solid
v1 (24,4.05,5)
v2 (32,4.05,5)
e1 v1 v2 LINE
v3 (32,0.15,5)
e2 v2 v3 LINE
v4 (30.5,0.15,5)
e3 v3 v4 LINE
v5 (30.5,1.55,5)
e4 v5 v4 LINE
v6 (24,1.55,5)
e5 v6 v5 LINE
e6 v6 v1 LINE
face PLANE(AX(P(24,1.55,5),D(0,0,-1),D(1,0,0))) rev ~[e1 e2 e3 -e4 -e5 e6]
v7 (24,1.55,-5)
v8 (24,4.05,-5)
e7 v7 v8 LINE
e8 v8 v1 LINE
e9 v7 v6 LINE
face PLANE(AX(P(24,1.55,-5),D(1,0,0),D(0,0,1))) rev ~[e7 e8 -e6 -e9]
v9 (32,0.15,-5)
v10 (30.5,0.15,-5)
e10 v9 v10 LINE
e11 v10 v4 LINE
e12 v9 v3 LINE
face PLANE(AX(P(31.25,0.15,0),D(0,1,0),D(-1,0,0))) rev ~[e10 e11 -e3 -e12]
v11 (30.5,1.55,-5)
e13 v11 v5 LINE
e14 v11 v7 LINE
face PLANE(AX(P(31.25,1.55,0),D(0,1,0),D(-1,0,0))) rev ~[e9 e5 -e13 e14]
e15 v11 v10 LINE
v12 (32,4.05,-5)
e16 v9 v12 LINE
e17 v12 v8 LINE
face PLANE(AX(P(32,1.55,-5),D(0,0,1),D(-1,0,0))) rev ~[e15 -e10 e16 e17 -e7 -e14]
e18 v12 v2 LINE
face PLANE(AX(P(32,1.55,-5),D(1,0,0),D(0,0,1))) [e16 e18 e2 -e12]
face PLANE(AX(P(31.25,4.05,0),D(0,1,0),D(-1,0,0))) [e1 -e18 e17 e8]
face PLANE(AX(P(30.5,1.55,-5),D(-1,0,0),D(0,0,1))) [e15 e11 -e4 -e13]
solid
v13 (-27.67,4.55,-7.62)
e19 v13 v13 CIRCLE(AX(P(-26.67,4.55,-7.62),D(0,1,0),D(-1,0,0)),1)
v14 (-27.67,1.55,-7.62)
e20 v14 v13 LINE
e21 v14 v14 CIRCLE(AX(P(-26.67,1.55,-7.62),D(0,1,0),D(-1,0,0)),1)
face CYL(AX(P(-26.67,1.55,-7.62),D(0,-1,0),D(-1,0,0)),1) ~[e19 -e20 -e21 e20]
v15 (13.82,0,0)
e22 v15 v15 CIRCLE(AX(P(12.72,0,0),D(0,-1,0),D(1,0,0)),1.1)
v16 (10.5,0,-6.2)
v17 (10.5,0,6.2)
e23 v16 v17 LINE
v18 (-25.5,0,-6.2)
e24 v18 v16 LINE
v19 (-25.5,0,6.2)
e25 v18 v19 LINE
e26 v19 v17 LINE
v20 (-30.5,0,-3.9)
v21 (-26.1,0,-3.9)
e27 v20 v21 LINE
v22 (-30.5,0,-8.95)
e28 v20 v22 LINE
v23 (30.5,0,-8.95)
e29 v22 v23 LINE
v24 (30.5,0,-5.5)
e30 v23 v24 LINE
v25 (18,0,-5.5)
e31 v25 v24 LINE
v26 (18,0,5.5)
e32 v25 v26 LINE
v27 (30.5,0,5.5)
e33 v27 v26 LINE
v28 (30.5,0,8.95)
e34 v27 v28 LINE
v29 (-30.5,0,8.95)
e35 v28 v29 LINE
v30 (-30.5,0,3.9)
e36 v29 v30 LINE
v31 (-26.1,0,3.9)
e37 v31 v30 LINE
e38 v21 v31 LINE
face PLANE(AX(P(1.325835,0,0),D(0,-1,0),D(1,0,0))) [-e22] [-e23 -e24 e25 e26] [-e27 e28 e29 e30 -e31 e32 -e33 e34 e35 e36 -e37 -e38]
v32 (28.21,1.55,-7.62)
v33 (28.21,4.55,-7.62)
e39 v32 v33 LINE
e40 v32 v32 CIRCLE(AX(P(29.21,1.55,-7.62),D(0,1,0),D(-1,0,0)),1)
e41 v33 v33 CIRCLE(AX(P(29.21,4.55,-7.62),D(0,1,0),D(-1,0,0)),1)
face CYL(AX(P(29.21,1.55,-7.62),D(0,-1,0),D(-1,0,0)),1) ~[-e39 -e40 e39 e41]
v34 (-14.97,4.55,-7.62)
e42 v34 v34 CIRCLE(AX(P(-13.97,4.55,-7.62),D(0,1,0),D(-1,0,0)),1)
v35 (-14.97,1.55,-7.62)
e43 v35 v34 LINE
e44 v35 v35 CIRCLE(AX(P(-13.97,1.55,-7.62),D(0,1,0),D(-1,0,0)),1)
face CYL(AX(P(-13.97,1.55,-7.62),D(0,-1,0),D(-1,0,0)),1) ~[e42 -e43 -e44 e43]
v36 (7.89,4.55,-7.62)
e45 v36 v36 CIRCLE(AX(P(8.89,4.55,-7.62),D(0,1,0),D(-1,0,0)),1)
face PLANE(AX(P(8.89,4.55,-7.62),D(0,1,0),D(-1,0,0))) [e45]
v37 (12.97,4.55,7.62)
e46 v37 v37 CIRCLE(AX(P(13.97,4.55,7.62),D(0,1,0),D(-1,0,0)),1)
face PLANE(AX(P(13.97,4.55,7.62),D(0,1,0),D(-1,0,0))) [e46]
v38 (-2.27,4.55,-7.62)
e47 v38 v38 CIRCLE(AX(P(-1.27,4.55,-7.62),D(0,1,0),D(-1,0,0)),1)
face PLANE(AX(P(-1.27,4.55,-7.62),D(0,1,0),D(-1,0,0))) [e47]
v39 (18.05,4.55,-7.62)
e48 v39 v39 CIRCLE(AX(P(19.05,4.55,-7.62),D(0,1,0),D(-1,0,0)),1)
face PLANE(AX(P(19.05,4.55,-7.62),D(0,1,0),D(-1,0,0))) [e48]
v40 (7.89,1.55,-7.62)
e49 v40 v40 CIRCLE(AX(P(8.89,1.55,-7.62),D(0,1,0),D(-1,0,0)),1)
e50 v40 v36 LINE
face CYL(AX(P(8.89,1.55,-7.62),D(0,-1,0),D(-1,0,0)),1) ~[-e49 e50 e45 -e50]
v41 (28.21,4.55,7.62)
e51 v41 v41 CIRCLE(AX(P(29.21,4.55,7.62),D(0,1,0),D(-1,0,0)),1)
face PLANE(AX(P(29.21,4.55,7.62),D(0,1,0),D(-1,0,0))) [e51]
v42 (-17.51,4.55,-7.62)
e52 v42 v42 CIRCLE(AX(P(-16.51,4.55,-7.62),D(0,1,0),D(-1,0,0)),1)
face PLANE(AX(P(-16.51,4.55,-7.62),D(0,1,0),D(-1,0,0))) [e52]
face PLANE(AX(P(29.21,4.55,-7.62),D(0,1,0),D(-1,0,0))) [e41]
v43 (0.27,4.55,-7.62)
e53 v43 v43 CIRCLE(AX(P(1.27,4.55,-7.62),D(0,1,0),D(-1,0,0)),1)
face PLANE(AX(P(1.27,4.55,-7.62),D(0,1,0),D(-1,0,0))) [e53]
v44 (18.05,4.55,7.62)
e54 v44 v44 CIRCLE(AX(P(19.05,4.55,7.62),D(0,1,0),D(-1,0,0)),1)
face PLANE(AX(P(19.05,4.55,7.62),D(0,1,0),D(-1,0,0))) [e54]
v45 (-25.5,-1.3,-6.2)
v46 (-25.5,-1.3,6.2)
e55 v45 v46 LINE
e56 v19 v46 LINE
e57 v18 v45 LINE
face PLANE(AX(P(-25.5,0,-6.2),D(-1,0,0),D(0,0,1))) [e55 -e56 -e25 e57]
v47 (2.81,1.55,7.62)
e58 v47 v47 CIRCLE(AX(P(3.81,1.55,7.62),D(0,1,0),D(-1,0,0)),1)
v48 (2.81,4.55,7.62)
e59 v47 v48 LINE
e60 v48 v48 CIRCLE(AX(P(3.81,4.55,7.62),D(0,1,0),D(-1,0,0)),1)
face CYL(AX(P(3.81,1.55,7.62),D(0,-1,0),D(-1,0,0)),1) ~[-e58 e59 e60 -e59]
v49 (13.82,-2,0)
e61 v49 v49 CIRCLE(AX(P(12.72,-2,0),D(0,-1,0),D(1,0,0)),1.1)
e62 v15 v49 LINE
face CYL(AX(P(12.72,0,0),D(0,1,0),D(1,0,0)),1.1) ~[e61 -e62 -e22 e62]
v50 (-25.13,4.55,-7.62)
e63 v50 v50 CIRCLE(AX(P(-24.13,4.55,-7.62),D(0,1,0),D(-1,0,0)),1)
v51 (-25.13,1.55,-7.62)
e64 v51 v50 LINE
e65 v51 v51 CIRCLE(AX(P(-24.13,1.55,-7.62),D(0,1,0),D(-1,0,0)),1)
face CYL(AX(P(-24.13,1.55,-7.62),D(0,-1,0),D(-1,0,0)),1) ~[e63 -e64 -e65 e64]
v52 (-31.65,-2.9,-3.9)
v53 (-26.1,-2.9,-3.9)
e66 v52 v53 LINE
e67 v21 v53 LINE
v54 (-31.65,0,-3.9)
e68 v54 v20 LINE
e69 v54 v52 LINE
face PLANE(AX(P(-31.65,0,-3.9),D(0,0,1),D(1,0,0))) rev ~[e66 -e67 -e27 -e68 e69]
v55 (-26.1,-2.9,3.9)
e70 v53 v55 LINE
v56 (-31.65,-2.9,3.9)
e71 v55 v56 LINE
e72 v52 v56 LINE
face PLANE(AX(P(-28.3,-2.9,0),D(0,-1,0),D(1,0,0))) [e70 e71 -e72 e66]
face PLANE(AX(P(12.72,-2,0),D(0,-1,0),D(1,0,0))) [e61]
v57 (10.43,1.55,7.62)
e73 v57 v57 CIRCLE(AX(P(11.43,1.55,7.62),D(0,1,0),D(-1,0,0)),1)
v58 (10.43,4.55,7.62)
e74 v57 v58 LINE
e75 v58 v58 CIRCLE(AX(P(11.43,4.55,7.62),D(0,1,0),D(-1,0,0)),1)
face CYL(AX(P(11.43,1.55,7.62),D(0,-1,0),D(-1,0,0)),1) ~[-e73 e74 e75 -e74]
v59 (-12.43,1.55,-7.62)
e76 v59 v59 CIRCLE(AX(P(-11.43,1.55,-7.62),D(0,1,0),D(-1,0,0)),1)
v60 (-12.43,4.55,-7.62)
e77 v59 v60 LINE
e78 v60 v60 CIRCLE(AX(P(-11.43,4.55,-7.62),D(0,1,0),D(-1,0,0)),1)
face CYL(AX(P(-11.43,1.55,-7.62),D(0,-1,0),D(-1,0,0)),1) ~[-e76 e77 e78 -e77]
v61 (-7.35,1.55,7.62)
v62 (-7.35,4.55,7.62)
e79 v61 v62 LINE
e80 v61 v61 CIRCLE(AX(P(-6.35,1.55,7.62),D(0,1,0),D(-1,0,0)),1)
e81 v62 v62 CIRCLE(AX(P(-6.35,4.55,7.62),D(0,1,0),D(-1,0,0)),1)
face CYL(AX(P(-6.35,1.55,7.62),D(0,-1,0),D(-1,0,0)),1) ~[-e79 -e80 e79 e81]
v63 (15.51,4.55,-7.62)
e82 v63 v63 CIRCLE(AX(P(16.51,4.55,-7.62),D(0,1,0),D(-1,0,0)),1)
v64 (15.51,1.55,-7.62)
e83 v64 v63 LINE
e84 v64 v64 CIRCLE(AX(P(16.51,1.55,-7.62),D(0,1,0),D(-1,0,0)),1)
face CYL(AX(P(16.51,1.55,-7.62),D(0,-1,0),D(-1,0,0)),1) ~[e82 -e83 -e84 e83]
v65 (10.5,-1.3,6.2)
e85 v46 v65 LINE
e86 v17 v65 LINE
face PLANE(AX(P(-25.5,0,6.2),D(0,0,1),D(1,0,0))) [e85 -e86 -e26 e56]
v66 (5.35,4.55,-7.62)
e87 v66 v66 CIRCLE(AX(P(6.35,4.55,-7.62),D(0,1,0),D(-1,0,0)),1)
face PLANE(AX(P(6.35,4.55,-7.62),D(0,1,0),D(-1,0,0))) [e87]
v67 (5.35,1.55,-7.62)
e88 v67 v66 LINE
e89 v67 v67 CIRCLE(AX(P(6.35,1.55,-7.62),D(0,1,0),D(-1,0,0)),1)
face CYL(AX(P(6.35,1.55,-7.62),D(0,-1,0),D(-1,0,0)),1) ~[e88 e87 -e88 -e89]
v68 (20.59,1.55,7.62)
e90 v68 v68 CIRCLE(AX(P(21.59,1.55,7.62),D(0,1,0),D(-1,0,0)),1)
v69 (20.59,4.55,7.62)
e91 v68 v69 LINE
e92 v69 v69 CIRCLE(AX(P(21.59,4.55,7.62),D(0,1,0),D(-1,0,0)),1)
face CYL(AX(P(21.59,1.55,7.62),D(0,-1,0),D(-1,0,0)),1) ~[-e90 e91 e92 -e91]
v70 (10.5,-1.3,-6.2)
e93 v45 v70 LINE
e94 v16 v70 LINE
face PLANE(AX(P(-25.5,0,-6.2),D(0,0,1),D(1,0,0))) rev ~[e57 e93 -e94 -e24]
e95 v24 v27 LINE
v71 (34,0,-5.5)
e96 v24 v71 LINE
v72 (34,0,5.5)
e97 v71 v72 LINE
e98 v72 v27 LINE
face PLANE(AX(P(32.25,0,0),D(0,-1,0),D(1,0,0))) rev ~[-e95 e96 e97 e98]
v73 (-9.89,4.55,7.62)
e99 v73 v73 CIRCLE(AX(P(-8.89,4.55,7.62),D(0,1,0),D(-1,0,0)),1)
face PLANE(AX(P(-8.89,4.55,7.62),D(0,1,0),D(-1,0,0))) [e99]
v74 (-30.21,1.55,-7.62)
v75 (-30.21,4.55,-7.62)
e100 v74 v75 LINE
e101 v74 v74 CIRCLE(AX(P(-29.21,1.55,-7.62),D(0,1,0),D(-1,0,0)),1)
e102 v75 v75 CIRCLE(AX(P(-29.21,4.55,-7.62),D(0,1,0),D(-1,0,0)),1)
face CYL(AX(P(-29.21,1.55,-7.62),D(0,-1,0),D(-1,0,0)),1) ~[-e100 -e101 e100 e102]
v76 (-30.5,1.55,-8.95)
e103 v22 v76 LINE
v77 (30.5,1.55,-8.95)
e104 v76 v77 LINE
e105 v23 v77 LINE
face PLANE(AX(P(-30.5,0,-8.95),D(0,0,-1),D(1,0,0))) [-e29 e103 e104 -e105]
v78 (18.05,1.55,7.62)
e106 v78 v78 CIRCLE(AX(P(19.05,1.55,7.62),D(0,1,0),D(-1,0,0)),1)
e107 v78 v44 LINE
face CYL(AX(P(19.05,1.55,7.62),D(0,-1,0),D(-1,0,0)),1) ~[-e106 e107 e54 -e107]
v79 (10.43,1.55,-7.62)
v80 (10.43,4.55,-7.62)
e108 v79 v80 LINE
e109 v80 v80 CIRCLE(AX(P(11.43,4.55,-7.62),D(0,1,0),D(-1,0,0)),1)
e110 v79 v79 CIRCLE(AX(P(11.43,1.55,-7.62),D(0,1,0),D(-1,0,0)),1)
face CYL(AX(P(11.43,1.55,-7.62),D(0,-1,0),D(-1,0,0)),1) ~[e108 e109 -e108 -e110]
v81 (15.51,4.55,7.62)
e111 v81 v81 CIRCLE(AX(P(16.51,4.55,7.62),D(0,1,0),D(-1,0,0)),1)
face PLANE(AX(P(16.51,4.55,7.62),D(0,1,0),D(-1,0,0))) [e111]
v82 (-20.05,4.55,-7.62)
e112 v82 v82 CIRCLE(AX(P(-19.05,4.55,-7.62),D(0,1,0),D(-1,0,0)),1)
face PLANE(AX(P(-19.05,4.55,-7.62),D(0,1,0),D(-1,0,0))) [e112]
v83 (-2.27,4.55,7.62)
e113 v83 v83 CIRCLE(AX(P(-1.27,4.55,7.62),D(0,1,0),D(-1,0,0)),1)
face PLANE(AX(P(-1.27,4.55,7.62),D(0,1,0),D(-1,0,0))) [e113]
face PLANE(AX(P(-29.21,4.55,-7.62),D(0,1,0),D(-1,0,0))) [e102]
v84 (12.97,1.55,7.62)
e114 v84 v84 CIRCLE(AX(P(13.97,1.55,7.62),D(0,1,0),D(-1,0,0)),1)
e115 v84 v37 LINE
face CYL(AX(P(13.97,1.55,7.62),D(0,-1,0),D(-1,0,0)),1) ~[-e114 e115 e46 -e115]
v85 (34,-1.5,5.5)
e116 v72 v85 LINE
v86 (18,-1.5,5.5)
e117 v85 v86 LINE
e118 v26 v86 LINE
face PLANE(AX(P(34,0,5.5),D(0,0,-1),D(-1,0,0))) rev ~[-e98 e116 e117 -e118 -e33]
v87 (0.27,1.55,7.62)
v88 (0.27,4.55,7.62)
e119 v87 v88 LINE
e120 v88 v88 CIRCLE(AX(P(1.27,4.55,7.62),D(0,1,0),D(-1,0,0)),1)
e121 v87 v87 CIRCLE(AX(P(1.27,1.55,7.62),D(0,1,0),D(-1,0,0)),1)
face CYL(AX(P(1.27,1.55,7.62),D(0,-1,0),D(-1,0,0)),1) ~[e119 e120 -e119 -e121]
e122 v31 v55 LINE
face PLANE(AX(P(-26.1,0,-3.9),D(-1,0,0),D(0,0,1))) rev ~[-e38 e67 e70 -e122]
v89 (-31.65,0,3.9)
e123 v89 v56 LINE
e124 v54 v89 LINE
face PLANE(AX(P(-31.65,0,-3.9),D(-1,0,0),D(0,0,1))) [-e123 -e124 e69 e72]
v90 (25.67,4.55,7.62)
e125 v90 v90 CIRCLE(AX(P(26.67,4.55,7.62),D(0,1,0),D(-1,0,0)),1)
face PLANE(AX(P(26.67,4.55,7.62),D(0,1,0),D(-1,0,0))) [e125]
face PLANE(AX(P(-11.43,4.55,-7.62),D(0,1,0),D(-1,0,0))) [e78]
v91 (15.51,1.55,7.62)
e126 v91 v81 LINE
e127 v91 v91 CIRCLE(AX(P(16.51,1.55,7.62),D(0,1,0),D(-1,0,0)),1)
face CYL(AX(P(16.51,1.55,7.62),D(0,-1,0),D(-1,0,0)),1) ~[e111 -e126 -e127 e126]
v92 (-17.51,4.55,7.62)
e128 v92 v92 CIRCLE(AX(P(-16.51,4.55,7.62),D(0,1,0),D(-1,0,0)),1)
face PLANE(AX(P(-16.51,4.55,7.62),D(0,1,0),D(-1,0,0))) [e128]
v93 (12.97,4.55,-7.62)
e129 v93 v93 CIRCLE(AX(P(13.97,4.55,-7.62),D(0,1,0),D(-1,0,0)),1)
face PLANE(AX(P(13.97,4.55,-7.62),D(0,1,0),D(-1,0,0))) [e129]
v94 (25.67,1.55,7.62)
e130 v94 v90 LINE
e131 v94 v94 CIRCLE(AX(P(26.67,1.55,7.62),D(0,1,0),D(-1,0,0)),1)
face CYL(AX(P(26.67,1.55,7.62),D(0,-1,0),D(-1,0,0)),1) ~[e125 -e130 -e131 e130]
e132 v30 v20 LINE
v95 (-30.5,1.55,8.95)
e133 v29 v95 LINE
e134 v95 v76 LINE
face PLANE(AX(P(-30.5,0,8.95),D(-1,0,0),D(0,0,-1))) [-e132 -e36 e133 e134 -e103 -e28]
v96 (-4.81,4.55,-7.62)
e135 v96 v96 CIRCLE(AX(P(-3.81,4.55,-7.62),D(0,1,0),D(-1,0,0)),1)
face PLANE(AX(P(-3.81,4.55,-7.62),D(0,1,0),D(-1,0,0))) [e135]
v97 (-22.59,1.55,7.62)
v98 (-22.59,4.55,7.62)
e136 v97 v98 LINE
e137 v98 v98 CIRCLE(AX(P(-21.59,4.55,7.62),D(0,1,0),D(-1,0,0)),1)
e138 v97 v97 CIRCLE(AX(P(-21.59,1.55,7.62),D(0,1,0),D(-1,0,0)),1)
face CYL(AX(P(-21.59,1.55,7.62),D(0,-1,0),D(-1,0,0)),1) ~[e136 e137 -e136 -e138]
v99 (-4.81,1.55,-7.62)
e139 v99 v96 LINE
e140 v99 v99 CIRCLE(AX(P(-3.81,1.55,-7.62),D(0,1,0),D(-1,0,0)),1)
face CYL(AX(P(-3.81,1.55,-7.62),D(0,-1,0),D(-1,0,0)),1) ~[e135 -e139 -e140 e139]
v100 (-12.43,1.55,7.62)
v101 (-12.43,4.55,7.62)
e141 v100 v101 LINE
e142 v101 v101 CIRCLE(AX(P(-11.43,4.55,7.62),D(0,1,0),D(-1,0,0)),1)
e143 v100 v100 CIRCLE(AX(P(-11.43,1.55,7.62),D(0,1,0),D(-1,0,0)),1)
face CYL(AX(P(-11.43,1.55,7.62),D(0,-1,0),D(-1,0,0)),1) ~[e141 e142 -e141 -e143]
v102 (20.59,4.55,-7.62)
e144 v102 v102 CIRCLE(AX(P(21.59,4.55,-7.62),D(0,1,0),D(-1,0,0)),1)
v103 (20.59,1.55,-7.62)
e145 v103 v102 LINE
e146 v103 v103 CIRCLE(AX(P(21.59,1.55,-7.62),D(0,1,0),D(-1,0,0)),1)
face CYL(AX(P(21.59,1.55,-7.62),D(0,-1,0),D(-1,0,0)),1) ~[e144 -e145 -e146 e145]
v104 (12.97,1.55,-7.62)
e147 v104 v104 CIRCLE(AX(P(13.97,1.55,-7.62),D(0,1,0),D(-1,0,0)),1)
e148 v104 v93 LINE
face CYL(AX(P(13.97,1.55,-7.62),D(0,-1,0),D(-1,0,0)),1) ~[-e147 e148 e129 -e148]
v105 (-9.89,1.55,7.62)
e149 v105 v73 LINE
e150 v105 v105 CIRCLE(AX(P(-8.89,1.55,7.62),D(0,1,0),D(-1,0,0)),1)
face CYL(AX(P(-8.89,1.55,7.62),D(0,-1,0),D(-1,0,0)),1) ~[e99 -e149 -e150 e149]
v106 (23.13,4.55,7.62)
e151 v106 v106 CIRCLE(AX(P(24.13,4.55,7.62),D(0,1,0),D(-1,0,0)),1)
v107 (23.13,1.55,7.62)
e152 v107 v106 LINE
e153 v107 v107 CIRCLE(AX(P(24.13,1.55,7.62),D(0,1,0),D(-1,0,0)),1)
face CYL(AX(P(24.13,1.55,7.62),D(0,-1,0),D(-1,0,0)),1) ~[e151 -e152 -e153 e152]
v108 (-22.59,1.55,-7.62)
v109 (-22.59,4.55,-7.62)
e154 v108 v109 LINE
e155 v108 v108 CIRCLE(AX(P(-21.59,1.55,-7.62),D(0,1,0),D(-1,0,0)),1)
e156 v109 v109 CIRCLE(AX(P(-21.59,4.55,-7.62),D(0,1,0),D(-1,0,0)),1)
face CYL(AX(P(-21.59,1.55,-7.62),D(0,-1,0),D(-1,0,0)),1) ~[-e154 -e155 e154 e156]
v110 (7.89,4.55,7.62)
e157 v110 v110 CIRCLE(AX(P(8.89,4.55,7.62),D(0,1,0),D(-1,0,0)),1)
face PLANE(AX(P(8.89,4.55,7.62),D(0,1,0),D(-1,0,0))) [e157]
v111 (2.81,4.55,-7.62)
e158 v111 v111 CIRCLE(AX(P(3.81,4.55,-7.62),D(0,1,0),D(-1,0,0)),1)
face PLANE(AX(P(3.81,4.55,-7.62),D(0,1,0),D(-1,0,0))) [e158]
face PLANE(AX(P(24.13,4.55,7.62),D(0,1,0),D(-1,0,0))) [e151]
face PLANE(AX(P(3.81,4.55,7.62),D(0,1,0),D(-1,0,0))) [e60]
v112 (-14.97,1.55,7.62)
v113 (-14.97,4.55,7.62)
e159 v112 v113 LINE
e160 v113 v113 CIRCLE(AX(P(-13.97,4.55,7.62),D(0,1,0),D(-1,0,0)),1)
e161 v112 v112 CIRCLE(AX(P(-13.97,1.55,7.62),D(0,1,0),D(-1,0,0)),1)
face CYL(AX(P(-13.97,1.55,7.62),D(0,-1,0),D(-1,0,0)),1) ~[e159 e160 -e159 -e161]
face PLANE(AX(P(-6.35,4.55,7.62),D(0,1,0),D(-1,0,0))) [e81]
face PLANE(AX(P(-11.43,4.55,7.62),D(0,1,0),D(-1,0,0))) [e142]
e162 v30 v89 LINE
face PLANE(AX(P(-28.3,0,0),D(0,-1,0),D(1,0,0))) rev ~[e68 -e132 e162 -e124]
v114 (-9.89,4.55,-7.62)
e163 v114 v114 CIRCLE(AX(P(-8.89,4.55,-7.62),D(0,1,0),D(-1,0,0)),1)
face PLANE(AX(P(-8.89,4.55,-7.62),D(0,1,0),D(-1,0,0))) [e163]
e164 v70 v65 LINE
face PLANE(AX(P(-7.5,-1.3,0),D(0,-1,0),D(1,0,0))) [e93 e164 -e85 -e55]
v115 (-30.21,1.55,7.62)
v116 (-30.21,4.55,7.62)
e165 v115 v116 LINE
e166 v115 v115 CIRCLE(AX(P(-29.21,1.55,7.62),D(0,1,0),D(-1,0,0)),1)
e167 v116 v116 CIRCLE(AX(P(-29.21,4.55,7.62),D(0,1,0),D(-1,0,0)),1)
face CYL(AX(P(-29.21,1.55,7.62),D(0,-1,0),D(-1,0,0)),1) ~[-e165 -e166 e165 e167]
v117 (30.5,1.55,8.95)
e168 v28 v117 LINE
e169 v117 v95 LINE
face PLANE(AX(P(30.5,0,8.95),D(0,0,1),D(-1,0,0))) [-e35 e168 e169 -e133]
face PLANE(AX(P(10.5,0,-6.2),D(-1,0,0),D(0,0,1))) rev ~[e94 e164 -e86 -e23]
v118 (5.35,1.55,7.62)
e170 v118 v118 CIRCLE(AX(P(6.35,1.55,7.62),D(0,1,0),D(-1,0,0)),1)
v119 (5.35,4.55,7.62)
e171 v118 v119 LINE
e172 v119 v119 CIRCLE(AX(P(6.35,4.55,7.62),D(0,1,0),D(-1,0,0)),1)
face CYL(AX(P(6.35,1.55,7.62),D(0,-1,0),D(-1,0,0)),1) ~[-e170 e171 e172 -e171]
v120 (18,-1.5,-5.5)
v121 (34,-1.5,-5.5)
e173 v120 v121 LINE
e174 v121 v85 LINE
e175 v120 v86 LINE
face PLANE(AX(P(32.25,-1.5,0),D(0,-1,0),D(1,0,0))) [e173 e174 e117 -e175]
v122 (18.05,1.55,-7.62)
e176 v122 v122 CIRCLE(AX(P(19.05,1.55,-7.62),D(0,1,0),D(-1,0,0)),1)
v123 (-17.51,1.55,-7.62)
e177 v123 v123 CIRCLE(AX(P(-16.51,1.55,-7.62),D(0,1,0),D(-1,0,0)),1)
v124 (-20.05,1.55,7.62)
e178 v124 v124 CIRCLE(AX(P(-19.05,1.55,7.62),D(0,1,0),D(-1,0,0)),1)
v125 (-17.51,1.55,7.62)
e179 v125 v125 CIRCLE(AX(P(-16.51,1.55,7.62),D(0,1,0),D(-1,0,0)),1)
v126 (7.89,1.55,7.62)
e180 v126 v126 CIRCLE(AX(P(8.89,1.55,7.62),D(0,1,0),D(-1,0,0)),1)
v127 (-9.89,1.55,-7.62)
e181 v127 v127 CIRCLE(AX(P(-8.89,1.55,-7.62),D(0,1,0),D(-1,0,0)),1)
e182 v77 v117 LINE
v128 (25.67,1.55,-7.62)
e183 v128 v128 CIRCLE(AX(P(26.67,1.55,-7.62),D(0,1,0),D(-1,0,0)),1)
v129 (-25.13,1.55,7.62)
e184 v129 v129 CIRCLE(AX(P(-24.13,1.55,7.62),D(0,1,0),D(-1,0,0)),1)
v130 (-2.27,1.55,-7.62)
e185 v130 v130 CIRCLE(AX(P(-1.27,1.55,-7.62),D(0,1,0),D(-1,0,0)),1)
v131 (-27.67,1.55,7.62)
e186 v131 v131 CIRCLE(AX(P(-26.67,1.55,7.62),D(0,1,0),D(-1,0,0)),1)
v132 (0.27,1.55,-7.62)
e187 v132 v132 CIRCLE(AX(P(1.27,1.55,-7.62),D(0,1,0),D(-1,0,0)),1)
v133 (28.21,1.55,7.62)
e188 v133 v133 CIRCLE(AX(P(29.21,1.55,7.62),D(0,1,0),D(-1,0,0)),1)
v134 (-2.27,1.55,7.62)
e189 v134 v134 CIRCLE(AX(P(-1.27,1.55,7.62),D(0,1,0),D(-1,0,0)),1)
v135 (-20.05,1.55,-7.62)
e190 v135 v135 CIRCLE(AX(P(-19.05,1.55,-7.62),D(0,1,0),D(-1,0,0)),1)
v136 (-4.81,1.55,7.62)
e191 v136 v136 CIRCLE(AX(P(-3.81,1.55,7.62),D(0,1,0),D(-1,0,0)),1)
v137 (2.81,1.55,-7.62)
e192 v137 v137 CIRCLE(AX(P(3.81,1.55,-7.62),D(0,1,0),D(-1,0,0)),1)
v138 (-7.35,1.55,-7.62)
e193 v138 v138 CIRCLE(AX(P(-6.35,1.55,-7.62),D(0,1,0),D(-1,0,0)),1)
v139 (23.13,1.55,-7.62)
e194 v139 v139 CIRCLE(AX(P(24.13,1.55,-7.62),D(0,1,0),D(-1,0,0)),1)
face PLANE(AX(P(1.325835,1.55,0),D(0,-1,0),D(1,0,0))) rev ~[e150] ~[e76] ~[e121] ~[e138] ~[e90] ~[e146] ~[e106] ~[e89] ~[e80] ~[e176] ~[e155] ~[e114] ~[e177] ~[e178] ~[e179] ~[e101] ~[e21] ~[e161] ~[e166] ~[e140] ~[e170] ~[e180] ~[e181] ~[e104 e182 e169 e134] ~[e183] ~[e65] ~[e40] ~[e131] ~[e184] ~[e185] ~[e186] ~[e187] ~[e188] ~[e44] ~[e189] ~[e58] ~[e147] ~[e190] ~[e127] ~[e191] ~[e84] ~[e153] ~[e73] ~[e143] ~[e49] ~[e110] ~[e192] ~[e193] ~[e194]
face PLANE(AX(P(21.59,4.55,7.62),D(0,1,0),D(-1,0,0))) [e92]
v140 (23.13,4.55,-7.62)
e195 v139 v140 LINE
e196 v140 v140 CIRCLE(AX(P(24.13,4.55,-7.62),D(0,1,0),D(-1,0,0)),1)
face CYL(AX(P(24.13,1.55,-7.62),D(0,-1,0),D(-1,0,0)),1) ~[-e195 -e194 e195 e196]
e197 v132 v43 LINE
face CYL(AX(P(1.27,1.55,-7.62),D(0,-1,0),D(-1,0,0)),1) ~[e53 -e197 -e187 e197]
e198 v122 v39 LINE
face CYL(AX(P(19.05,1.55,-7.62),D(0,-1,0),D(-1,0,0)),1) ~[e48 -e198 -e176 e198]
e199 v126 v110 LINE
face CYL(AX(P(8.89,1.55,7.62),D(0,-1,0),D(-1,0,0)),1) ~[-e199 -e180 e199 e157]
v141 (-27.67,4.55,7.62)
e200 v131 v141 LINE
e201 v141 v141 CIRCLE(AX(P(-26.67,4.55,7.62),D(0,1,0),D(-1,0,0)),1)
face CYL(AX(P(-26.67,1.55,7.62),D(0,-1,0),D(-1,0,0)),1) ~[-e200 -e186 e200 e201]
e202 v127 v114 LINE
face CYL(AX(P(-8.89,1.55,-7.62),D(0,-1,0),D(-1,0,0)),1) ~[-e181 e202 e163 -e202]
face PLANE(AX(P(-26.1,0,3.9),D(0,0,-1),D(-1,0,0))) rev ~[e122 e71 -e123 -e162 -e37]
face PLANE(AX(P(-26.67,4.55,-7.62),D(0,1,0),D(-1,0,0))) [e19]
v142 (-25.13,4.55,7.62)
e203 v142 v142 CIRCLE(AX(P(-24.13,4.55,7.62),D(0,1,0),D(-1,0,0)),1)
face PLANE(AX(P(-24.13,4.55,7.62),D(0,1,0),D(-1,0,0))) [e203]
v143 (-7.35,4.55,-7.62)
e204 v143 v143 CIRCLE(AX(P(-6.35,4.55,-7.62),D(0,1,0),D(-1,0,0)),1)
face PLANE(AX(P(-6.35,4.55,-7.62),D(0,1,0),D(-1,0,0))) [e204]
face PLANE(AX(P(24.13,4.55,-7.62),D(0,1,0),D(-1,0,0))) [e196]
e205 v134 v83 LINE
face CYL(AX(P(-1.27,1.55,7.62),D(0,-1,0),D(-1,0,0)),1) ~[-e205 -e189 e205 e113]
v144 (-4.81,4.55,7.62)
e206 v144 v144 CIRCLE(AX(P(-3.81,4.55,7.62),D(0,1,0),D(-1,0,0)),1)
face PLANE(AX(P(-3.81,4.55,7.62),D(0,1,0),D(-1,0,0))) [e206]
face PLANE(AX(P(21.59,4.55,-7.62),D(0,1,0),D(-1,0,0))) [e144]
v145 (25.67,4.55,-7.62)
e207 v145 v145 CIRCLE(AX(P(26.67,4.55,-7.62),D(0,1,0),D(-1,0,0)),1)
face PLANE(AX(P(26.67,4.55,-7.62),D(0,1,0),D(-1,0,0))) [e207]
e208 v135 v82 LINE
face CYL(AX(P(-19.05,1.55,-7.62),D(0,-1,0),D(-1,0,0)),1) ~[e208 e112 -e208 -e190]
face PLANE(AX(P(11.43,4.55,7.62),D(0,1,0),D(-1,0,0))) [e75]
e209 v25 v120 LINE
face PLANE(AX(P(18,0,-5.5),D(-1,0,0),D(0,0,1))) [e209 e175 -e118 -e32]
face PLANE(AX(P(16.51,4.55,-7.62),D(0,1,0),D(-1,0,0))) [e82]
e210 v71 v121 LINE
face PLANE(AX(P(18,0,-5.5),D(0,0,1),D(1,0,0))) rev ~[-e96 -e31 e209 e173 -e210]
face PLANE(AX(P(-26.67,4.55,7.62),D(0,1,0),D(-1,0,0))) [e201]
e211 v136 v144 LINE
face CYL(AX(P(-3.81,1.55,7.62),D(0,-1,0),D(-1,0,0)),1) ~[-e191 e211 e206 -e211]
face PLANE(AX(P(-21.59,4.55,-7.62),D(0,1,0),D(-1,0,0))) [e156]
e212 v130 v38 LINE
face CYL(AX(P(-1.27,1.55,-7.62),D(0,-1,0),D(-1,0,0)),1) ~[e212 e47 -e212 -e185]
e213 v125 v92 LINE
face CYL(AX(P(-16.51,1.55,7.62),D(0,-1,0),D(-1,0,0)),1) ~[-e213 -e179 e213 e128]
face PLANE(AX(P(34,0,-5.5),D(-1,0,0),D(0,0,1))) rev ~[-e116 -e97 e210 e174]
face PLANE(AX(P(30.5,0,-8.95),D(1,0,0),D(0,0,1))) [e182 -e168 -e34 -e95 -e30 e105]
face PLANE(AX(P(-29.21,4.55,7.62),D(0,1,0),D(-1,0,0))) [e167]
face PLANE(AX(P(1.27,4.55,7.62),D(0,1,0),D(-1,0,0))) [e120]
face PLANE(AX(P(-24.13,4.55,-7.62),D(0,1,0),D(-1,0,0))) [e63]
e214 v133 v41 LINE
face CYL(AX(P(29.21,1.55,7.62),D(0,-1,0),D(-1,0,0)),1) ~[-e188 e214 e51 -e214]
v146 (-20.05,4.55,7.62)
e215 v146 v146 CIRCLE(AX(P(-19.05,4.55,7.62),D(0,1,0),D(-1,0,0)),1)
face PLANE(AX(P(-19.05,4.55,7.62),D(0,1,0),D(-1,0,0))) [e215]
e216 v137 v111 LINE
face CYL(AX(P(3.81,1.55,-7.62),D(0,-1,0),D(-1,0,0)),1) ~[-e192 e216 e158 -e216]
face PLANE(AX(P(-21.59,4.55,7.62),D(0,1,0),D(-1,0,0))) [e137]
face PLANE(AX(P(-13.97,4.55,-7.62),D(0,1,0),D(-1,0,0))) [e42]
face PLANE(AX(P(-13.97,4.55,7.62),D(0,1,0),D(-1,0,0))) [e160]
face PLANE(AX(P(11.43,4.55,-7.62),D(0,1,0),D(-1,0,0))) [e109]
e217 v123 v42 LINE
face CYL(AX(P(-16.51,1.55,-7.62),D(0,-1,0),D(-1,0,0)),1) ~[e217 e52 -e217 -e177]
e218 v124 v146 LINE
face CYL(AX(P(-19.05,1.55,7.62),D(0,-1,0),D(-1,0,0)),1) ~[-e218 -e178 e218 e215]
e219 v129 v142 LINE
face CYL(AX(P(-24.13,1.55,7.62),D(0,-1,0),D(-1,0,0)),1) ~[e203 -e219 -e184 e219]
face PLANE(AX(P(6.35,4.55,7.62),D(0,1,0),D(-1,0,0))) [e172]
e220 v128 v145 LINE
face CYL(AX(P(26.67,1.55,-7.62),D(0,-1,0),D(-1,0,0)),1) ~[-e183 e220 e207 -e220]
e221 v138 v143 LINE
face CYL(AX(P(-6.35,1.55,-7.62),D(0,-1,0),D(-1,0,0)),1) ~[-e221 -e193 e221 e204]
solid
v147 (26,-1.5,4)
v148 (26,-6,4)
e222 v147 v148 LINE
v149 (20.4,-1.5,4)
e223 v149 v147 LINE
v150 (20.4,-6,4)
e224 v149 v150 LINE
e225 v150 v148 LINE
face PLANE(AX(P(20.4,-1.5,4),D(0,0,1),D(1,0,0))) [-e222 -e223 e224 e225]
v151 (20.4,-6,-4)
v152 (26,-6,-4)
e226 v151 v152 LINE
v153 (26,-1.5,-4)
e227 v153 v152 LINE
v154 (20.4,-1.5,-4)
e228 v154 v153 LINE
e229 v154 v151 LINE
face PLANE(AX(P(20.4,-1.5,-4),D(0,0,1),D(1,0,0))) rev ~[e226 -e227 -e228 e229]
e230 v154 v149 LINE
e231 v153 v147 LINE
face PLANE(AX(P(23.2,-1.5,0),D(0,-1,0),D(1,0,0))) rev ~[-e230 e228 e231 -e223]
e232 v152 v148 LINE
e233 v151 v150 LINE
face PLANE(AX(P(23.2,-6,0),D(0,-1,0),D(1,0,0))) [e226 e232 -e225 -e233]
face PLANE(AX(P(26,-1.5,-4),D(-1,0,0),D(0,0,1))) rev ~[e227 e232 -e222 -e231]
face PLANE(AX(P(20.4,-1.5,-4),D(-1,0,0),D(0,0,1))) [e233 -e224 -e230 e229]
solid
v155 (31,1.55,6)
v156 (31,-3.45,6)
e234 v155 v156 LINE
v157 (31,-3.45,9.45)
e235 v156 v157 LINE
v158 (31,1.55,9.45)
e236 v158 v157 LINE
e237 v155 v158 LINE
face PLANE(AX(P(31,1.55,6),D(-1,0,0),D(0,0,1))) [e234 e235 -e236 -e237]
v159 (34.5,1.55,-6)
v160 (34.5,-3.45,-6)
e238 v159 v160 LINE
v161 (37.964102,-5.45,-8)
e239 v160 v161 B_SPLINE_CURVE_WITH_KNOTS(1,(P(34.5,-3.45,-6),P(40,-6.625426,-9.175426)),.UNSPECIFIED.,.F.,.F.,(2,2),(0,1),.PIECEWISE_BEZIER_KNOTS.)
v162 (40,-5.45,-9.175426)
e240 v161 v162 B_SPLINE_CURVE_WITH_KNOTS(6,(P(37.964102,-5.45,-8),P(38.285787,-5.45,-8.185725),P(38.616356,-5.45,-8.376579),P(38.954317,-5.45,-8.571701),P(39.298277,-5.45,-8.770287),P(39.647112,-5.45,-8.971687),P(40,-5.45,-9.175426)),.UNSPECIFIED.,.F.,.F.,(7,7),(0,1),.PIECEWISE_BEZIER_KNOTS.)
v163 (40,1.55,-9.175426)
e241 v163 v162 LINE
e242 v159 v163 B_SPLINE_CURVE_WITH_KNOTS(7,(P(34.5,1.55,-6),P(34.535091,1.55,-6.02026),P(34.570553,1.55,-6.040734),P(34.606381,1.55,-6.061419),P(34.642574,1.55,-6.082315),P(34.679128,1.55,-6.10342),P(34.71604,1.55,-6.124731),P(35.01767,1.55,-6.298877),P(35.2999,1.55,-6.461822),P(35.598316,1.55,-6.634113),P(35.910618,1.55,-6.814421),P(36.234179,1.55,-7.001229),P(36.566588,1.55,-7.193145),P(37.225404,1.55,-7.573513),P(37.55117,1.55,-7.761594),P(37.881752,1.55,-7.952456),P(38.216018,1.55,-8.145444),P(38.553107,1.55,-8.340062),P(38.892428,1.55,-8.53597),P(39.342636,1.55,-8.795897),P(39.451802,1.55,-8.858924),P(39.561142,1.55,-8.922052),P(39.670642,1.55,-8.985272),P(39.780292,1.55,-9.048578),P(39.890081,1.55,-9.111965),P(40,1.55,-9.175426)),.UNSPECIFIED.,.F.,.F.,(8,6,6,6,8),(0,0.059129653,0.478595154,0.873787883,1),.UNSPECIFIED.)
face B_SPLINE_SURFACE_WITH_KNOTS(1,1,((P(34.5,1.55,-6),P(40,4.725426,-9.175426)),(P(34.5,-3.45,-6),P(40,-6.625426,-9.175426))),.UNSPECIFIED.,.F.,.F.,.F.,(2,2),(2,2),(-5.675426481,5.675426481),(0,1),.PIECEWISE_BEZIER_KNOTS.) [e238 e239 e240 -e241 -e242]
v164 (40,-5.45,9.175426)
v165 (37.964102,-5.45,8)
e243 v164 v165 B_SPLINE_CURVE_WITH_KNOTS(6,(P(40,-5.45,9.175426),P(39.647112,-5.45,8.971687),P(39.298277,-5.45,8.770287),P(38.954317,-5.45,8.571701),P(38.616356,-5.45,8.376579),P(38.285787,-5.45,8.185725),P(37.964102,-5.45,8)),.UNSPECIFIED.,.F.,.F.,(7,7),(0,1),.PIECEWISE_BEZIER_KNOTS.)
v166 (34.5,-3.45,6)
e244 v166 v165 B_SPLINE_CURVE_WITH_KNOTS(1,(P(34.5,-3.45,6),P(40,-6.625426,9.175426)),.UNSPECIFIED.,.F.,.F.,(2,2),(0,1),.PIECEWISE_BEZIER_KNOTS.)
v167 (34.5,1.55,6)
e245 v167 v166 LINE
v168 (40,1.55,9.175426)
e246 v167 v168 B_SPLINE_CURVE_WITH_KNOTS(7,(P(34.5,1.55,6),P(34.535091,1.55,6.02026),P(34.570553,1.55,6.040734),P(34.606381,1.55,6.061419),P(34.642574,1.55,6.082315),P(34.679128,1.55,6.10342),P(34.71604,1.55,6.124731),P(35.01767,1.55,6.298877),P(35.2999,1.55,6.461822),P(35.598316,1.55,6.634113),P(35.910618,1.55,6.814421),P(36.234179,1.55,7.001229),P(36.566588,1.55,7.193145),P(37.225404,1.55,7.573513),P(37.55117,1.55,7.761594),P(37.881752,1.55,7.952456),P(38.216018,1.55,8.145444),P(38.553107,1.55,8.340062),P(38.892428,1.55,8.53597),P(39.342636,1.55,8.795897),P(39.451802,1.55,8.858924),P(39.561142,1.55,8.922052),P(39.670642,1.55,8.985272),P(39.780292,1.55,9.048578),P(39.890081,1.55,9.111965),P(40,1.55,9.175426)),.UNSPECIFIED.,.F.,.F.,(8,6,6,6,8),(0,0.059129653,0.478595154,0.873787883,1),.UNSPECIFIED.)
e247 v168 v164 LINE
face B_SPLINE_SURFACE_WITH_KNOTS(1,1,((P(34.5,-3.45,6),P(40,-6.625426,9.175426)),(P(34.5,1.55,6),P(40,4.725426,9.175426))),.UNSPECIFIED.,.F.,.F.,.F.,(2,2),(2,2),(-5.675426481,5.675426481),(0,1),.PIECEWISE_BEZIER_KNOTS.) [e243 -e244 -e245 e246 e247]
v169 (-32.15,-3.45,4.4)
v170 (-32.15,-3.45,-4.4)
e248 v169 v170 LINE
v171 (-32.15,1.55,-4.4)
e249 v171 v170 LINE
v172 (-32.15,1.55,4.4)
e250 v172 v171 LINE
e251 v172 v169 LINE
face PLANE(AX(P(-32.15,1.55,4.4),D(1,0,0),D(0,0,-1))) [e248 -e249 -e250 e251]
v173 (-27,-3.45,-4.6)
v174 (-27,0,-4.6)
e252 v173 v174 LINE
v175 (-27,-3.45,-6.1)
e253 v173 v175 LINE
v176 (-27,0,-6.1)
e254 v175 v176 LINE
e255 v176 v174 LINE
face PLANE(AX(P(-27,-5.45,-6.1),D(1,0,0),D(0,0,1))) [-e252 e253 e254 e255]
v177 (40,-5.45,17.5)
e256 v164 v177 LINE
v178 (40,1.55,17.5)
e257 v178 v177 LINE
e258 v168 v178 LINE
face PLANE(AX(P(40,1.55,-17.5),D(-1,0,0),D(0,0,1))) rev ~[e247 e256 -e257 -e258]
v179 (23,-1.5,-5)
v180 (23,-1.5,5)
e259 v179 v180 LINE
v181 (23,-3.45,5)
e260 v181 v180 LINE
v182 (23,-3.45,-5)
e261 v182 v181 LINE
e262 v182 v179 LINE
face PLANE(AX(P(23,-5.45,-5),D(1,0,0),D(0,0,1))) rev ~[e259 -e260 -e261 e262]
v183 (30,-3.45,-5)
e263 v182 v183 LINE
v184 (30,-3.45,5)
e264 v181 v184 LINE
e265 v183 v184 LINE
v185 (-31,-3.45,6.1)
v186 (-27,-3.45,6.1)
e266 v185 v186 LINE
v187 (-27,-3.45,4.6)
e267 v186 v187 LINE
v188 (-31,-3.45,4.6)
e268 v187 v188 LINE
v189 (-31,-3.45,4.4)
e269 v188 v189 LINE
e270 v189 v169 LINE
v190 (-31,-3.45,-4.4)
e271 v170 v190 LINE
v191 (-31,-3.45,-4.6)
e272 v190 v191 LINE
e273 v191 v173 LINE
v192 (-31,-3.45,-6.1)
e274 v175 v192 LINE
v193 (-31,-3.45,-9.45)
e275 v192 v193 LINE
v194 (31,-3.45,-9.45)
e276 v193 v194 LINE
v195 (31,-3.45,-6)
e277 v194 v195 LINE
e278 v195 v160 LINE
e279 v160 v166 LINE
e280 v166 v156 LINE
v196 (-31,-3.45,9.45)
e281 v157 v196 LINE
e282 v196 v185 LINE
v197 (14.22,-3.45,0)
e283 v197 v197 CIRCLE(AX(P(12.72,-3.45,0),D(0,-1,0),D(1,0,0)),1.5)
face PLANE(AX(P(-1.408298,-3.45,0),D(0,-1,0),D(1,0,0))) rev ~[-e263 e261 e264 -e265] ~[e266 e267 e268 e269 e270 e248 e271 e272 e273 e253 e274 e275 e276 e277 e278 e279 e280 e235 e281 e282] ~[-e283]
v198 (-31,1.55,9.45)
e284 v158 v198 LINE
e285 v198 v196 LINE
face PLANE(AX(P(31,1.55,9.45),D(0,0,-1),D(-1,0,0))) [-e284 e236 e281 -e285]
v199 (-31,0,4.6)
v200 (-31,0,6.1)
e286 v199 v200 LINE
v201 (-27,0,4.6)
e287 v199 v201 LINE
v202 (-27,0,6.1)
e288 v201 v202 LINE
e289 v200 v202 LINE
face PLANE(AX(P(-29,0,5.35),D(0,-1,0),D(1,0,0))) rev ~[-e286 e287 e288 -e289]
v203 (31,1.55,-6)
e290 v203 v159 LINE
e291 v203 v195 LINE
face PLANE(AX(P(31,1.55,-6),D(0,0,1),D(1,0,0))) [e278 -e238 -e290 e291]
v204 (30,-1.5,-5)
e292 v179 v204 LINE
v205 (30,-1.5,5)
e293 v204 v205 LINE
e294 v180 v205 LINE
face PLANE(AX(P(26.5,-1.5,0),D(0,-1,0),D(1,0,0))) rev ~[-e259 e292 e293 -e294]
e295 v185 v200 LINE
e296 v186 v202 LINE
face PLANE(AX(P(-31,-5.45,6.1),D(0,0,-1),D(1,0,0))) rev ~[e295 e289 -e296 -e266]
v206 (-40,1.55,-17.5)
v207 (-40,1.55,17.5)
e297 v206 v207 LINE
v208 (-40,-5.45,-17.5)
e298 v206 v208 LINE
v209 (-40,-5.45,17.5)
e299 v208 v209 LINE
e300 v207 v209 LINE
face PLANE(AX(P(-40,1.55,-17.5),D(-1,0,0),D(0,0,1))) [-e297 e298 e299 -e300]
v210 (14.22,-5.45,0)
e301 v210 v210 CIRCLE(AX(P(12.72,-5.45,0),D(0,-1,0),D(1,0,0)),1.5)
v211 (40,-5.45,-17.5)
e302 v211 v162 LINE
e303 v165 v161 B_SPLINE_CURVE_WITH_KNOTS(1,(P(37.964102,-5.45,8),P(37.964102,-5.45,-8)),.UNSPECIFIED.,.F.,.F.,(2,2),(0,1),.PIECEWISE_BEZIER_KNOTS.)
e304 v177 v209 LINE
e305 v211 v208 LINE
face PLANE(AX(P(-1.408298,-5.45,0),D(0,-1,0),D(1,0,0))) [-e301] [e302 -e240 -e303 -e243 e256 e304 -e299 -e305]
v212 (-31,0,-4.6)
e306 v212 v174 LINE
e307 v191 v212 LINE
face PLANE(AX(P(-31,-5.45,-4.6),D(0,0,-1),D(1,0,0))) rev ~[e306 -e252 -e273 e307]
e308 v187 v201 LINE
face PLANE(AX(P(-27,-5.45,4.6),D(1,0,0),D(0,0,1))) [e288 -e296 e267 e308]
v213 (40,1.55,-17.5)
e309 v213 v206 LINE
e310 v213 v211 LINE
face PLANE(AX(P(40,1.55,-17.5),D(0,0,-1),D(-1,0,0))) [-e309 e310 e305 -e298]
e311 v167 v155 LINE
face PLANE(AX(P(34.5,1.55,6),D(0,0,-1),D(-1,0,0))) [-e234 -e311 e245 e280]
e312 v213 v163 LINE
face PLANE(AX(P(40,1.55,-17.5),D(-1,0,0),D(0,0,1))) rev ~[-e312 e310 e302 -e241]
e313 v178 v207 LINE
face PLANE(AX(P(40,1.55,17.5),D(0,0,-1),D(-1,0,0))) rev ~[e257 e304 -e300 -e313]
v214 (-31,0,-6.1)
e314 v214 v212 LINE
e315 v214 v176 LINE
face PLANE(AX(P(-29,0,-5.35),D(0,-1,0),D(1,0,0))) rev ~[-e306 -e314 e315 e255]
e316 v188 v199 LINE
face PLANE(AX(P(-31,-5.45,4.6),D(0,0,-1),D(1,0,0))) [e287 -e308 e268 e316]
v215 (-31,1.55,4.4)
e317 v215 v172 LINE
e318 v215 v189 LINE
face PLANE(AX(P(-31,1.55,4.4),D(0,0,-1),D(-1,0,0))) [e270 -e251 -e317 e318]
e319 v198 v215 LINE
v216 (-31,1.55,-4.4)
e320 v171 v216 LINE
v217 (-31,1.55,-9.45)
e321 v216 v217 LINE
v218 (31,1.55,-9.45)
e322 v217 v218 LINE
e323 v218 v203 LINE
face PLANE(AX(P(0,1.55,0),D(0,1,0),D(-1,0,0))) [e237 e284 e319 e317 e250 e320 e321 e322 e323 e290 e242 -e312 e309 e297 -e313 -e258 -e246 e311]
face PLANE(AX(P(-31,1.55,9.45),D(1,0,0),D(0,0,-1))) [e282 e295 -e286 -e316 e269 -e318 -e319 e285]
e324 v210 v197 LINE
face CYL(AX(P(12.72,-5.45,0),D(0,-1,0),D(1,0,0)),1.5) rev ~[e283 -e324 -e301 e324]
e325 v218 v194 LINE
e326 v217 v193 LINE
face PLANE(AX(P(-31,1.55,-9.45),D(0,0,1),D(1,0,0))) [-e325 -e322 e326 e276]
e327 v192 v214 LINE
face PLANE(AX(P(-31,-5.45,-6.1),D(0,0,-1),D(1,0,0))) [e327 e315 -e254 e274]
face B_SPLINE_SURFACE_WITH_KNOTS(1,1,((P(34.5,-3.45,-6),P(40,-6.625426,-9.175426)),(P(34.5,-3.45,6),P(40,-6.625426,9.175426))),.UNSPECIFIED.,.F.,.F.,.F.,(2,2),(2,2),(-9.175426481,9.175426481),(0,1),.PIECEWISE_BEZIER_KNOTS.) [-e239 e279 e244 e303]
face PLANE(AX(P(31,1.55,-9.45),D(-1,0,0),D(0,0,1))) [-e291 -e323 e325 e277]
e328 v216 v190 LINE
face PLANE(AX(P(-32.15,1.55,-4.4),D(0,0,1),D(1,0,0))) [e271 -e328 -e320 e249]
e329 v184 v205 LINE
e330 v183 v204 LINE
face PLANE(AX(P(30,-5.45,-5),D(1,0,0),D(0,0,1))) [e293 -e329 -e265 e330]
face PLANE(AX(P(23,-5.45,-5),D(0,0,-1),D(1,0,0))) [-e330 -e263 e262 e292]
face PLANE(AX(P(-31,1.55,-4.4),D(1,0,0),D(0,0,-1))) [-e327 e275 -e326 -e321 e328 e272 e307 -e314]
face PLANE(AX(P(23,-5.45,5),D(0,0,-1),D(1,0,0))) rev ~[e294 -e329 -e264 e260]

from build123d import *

# Parameters (mm, degrees)
F0_W      = 36
F0_H      = 12.4
F0_R      = 1.1
F0_W_2    = 4.4
F0_H_2    = 7.8
F0_W_3    = 12.5
F0_H_3    = 11
F1_DEPTH  = 1.55
F2_DEPTH  = 2
F0_W_4    = 1.15
F3_DEPTH  = 2.9
F0_W_5    = 3.5
F4_DEPTH  = 1.5
F5_DEPTH  = 1.3
F6_R      = 1
F7_DEPTH  = 3
F8_W      = 5.6
F8_H      = 8
F10_DEPTH = 4.5
F9_W      = 1.5
F9_H      = 10
F11_DEPTH = 1.4
F9_W_2    = 6.5
F12_DEPTH = 2.5
F13_W     = 80
F13_H     = 35
F14_DEPTH = 7
F15_W     = 7
F15_H     = 10
F16_DEPTH = 2
F15_W_2   = 4
F15_H_2   = 1.5
F17_DEPTH = 5.45
F18_DEPTH = 3.95
F19_R     = 1.5
F20_DEPTH = 2
F21_W     = 5
F21_H     = 12
F22_DEPTH = 5.5
F22_TAPER = -30


with BuildPart() as f1:
    # F0 (on Front) → F1 (new body)
    with BuildSketch(Plane.XZ):
        Polygon((-30.5, -8.95), (30.5, -8.95), (30.5, -5.5), (18, -5.5), (18, 5.5), (30.5, 5.5), (30.5, 8.95), (-30.5, 8.95), (-30.5, 3.9), (-26.1, 3.9), (-26.1, -3.9), (-30.5, -3.9), align=None)
        with Locations((-7.5, 0)):
            Rectangle(F0_W, F0_H, mode=Mode.SUBTRACT)
        with Locations((12.72, 0)):
            Circle(F0_R, mode=Mode.SUBTRACT)
        with Locations((-28.3, 0)):
            Rectangle(F0_W_2, F0_H_2)
        with Locations((24.25, 0)):
            Rectangle(F0_W_3, F0_H_3)
        with Locations((12.72, 0)):
            Circle(F0_R)
        with Locations((-7.5, 0)):
            Rectangle(F0_W, F0_H)
    extrude(amount=-F1_DEPTH)

    # F0 (on Front) → F2 (join)
    with BuildSketch(Plane.XZ):
        with Locations((12.72, 0)):
            Circle(F0_R)
    extrude(amount=F2_DEPTH)

    # F0 (on Front) → F3 (join)
    with BuildSketch(Plane.XZ):
        with Locations((-28.3, 0)):
            Rectangle(F0_W_2, F0_H_2)
        with Locations((-31.075, 0)):
            Rectangle(F0_W_4, F0_H_2)
    extrude(amount=F3_DEPTH)

    # F0 (on Front) → F4 (join)
    with BuildSketch(Plane.XZ):
        with Locations((32.25, 0)):
            Rectangle(F0_W_5, F0_H_3)
        with Locations((24.25, 0)):
            Rectangle(F0_W_3, F0_H_3)
    extrude(amount=F4_DEPTH)

    # F0 (on Front) → F5 (join)
    with BuildSketch(Plane.XZ):
        with Locations((-7.5, 0)):
            Rectangle(F0_W, F0_H)
    extrude(amount=F5_DEPTH)

    # F6 (on face) → F7 (join)
    with BuildSketch(Plane(origin=(0, 1.55, 0), x_dir=(-1, 0, 0), z_dir=(0, 1, 0))):
        with Locations((29.21, -7.62)):
            Circle(F6_R)
        with Locations((29.21, 7.62)):
            Circle(F6_R)
        with Locations((26.67, -7.62)):
            Circle(F6_R)
        with Locations((26.67, 7.62)):
            Circle(F6_R)
        with Locations((24.13, -7.62)):
            Circle(F6_R)
        with Locations((24.13, 7.62)):
            Circle(F6_R)
        with Locations((21.59, -7.62)):
            Circle(F6_R)
        with Locations((21.59, 7.62)):
            Circle(F6_R)
        with Locations((19.05, -7.62)):
            Circle(F6_R)
        with Locations((19.05, 7.62)):
            Circle(F6_R)
        with Locations((16.51, -7.62)):
            Circle(F6_R)
        with Locations((16.51, 7.62)):
            Circle(F6_R)
        with Locations((13.97, -7.62)):
            Circle(F6_R)
        with Locations((13.97, 7.62)):
            Circle(F6_R)
        with Locations((11.43, -7.62)):
            Circle(F6_R)
        with Locations((11.43, 7.62)):
            Circle(F6_R)
        with Locations((8.89, -7.62)):
            Circle(F6_R)
        with Locations((8.89, 7.62)):
            Circle(F6_R)
        with Locations((6.35, -7.62)):
            Circle(F6_R)
        with Locations((6.35, 7.62)):
            Circle(F6_R)
        with Locations((3.81, -7.62)):
            Circle(F6_R)
        with Locations((3.81, 7.62)):
            Circle(F6_R)
        with Locations((1.27, -7.62)):
            Circle(F6_R)
        with Locations((1.27, 7.62)):
            Circle(F6_R)
        with Locations((-1.27, -7.62)):
            Circle(F6_R)
        with Locations((-1.27, 7.62)):
            Circle(F6_R)
        with Locations((-3.81, -7.62)):
            Circle(F6_R)
        with Locations((-3.81, 7.62)):
            Circle(F6_R)
        with Locations((-6.35, -7.62)):
            Circle(F6_R)
        with Locations((-6.35, 7.62)):
            Circle(F6_R)
        with Locations((-8.89, -7.62)):
            Circle(F6_R)
        with Locations((-8.89, 7.62)):
            Circle(F6_R)
        with Locations((-11.43, -7.62)):
            Circle(F6_R)
        with Locations((-11.43, 7.62)):
            Circle(F6_R)
        with Locations((-13.97, -7.62)):
            Circle(F6_R)
        with Locations((-13.97, 7.62)):
            Circle(F6_R)
        with Locations((-16.51, -7.62)):
            Circle(F6_R)
        with Locations((-16.51, 7.62)):
            Circle(F6_R)
        with Locations((-19.05, -7.62)):
            Circle(F6_R)
        with Locations((-19.05, 7.62)):
            Circle(F6_R)
        with Locations((-21.59, -7.62)):
            Circle(F6_R)
        with Locations((-21.59, 7.62)):
            Circle(F6_R)
        with Locations((-24.13, -7.62)):
            Circle(F6_R)
        with Locations((-24.13, 7.62)):
            Circle(F6_R)
        with Locations((-26.67, -7.62)):
            Circle(F6_R)
        with Locations((-26.67, 7.62)):
            Circle(F6_R)
        with Locations((-29.21, -7.62)):
            Circle(F6_R)
        with Locations((-29.21, 7.62)):
            Circle(F6_R)
    extrude(amount=F7_DEPTH)


with BuildPart() as f10:
    # F8 (on face) → F10 (new body)
    with BuildSketch(Plane.XZ.offset(1.5)):
        with Locations((23.2, 0)):
            Rectangle(F8_W, F8_H)
    extrude(amount=F10_DEPTH)


with BuildPart() as f11:
    # F9 (on face) → F11 (new body)
    with BuildSketch(Plane(origin=(0, 1.55, 0), x_dir=(-1, 0, 0), z_dir=(0, 1, 0))):
        with Locations((-31.25, 0)):
            Rectangle(F9_W, F9_H)
    extrude(amount=-F11_DEPTH)

    # F9 (on face) → F12 (join)
    with BuildSketch(Plane(origin=(0, 1.55, 0), x_dir=(-1, 0, 0), z_dir=(0, 1, 0))):
        with Locations((-31.25, 0)):
            Rectangle(F9_W, F9_H)
        with Locations((-27.25, 0)):
            Rectangle(F9_W_2, F9_H)
    extrude(amount=F12_DEPTH)


with BuildPart() as f14:
    # F13 (on face) → F14 (new body)
    with BuildSketch(Plane(origin=(0, 1.55, 0), x_dir=(-1, 0, 0), z_dir=(0, 1, 0))):
        Rectangle(F13_W, F13_H)
        Polygon((-34.5, 6), (-31, 6), (-31, 9.45), (31, 9.45), (31, 4.4), (32.15, 4.4), (32.15, -4.4), (31, -4.4), (31, -9.45), (-31, -9.45), (-31, -6), (-34.5, -6), align=None, mode=Mode.SUBTRACT)
    extrude(amount=-F14_DEPTH)

    # F15 (on face) → F16 (join)
    with BuildSketch(Plane.XZ.offset(5.45)):
        Polygon((-31, 9.45), (-31, 6.1), (-27, 6.1), (-27, 4.6), (-31, 4.6), (-31, 4.4), (-32.15, 4.4), (-32.15, -4.4), (-31, -4.4), (-31, -4.6), (-27, -4.6), (-27, -6.1), (-31, -6.1), (-31, -9.45), (31, -9.45), (31, -6), (34.5, -6), (34.5, 6), (31, 6), (31, 9.45), align=None)
        with Locations((26.5, 0)):
            Rectangle(F15_W, F15_H, mode=Mode.SUBTRACT)
    extrude(amount=-F16_DEPTH)

    # F15 (on face) → F17 (join, through all)
    with BuildSketch(Plane.XZ.offset(5.45)):
        with Locations((-29, 5.35)):
            Rectangle(F15_W_2, F15_H_2)
        with Locations((-29, -5.35)):
            Rectangle(F15_W_2, F15_H_2)
    extrude(amount=-F17_DEPTH)

    # F15 (on face) → F18 (join, through all)
    with BuildSketch(Plane.XZ.offset(5.45)):
        with Locations((26.5, 0)):
            Rectangle(F15_W, F15_H)
    extrude(amount=-F18_DEPTH)

    # F19 (on face) → F20 (cut, through all)
    with BuildSketch(Plane.XZ.offset(5.45)):
        with Locations((12.72, 0)):
            Circle(F19_R)
    extrude(amount=-F20_DEPTH, mode=Mode.SUBTRACT)

    # F21 (on face) → F22 (cut, through all)
    with BuildSketch(Plane(origin=(34.5, 0, 0), x_dir=(0, -1, 0), z_dir=(-1, 0, 0))):
        with Locations((0.95, 0)):
            Rectangle(F21_W, F21_H)
    extrude(amount=-F22_DEPTH, taper=F22_TAPER, mode=Mode.SUBTRACT)


solid = Compound([f1.part, f10.part, f11.part, f14.part])
